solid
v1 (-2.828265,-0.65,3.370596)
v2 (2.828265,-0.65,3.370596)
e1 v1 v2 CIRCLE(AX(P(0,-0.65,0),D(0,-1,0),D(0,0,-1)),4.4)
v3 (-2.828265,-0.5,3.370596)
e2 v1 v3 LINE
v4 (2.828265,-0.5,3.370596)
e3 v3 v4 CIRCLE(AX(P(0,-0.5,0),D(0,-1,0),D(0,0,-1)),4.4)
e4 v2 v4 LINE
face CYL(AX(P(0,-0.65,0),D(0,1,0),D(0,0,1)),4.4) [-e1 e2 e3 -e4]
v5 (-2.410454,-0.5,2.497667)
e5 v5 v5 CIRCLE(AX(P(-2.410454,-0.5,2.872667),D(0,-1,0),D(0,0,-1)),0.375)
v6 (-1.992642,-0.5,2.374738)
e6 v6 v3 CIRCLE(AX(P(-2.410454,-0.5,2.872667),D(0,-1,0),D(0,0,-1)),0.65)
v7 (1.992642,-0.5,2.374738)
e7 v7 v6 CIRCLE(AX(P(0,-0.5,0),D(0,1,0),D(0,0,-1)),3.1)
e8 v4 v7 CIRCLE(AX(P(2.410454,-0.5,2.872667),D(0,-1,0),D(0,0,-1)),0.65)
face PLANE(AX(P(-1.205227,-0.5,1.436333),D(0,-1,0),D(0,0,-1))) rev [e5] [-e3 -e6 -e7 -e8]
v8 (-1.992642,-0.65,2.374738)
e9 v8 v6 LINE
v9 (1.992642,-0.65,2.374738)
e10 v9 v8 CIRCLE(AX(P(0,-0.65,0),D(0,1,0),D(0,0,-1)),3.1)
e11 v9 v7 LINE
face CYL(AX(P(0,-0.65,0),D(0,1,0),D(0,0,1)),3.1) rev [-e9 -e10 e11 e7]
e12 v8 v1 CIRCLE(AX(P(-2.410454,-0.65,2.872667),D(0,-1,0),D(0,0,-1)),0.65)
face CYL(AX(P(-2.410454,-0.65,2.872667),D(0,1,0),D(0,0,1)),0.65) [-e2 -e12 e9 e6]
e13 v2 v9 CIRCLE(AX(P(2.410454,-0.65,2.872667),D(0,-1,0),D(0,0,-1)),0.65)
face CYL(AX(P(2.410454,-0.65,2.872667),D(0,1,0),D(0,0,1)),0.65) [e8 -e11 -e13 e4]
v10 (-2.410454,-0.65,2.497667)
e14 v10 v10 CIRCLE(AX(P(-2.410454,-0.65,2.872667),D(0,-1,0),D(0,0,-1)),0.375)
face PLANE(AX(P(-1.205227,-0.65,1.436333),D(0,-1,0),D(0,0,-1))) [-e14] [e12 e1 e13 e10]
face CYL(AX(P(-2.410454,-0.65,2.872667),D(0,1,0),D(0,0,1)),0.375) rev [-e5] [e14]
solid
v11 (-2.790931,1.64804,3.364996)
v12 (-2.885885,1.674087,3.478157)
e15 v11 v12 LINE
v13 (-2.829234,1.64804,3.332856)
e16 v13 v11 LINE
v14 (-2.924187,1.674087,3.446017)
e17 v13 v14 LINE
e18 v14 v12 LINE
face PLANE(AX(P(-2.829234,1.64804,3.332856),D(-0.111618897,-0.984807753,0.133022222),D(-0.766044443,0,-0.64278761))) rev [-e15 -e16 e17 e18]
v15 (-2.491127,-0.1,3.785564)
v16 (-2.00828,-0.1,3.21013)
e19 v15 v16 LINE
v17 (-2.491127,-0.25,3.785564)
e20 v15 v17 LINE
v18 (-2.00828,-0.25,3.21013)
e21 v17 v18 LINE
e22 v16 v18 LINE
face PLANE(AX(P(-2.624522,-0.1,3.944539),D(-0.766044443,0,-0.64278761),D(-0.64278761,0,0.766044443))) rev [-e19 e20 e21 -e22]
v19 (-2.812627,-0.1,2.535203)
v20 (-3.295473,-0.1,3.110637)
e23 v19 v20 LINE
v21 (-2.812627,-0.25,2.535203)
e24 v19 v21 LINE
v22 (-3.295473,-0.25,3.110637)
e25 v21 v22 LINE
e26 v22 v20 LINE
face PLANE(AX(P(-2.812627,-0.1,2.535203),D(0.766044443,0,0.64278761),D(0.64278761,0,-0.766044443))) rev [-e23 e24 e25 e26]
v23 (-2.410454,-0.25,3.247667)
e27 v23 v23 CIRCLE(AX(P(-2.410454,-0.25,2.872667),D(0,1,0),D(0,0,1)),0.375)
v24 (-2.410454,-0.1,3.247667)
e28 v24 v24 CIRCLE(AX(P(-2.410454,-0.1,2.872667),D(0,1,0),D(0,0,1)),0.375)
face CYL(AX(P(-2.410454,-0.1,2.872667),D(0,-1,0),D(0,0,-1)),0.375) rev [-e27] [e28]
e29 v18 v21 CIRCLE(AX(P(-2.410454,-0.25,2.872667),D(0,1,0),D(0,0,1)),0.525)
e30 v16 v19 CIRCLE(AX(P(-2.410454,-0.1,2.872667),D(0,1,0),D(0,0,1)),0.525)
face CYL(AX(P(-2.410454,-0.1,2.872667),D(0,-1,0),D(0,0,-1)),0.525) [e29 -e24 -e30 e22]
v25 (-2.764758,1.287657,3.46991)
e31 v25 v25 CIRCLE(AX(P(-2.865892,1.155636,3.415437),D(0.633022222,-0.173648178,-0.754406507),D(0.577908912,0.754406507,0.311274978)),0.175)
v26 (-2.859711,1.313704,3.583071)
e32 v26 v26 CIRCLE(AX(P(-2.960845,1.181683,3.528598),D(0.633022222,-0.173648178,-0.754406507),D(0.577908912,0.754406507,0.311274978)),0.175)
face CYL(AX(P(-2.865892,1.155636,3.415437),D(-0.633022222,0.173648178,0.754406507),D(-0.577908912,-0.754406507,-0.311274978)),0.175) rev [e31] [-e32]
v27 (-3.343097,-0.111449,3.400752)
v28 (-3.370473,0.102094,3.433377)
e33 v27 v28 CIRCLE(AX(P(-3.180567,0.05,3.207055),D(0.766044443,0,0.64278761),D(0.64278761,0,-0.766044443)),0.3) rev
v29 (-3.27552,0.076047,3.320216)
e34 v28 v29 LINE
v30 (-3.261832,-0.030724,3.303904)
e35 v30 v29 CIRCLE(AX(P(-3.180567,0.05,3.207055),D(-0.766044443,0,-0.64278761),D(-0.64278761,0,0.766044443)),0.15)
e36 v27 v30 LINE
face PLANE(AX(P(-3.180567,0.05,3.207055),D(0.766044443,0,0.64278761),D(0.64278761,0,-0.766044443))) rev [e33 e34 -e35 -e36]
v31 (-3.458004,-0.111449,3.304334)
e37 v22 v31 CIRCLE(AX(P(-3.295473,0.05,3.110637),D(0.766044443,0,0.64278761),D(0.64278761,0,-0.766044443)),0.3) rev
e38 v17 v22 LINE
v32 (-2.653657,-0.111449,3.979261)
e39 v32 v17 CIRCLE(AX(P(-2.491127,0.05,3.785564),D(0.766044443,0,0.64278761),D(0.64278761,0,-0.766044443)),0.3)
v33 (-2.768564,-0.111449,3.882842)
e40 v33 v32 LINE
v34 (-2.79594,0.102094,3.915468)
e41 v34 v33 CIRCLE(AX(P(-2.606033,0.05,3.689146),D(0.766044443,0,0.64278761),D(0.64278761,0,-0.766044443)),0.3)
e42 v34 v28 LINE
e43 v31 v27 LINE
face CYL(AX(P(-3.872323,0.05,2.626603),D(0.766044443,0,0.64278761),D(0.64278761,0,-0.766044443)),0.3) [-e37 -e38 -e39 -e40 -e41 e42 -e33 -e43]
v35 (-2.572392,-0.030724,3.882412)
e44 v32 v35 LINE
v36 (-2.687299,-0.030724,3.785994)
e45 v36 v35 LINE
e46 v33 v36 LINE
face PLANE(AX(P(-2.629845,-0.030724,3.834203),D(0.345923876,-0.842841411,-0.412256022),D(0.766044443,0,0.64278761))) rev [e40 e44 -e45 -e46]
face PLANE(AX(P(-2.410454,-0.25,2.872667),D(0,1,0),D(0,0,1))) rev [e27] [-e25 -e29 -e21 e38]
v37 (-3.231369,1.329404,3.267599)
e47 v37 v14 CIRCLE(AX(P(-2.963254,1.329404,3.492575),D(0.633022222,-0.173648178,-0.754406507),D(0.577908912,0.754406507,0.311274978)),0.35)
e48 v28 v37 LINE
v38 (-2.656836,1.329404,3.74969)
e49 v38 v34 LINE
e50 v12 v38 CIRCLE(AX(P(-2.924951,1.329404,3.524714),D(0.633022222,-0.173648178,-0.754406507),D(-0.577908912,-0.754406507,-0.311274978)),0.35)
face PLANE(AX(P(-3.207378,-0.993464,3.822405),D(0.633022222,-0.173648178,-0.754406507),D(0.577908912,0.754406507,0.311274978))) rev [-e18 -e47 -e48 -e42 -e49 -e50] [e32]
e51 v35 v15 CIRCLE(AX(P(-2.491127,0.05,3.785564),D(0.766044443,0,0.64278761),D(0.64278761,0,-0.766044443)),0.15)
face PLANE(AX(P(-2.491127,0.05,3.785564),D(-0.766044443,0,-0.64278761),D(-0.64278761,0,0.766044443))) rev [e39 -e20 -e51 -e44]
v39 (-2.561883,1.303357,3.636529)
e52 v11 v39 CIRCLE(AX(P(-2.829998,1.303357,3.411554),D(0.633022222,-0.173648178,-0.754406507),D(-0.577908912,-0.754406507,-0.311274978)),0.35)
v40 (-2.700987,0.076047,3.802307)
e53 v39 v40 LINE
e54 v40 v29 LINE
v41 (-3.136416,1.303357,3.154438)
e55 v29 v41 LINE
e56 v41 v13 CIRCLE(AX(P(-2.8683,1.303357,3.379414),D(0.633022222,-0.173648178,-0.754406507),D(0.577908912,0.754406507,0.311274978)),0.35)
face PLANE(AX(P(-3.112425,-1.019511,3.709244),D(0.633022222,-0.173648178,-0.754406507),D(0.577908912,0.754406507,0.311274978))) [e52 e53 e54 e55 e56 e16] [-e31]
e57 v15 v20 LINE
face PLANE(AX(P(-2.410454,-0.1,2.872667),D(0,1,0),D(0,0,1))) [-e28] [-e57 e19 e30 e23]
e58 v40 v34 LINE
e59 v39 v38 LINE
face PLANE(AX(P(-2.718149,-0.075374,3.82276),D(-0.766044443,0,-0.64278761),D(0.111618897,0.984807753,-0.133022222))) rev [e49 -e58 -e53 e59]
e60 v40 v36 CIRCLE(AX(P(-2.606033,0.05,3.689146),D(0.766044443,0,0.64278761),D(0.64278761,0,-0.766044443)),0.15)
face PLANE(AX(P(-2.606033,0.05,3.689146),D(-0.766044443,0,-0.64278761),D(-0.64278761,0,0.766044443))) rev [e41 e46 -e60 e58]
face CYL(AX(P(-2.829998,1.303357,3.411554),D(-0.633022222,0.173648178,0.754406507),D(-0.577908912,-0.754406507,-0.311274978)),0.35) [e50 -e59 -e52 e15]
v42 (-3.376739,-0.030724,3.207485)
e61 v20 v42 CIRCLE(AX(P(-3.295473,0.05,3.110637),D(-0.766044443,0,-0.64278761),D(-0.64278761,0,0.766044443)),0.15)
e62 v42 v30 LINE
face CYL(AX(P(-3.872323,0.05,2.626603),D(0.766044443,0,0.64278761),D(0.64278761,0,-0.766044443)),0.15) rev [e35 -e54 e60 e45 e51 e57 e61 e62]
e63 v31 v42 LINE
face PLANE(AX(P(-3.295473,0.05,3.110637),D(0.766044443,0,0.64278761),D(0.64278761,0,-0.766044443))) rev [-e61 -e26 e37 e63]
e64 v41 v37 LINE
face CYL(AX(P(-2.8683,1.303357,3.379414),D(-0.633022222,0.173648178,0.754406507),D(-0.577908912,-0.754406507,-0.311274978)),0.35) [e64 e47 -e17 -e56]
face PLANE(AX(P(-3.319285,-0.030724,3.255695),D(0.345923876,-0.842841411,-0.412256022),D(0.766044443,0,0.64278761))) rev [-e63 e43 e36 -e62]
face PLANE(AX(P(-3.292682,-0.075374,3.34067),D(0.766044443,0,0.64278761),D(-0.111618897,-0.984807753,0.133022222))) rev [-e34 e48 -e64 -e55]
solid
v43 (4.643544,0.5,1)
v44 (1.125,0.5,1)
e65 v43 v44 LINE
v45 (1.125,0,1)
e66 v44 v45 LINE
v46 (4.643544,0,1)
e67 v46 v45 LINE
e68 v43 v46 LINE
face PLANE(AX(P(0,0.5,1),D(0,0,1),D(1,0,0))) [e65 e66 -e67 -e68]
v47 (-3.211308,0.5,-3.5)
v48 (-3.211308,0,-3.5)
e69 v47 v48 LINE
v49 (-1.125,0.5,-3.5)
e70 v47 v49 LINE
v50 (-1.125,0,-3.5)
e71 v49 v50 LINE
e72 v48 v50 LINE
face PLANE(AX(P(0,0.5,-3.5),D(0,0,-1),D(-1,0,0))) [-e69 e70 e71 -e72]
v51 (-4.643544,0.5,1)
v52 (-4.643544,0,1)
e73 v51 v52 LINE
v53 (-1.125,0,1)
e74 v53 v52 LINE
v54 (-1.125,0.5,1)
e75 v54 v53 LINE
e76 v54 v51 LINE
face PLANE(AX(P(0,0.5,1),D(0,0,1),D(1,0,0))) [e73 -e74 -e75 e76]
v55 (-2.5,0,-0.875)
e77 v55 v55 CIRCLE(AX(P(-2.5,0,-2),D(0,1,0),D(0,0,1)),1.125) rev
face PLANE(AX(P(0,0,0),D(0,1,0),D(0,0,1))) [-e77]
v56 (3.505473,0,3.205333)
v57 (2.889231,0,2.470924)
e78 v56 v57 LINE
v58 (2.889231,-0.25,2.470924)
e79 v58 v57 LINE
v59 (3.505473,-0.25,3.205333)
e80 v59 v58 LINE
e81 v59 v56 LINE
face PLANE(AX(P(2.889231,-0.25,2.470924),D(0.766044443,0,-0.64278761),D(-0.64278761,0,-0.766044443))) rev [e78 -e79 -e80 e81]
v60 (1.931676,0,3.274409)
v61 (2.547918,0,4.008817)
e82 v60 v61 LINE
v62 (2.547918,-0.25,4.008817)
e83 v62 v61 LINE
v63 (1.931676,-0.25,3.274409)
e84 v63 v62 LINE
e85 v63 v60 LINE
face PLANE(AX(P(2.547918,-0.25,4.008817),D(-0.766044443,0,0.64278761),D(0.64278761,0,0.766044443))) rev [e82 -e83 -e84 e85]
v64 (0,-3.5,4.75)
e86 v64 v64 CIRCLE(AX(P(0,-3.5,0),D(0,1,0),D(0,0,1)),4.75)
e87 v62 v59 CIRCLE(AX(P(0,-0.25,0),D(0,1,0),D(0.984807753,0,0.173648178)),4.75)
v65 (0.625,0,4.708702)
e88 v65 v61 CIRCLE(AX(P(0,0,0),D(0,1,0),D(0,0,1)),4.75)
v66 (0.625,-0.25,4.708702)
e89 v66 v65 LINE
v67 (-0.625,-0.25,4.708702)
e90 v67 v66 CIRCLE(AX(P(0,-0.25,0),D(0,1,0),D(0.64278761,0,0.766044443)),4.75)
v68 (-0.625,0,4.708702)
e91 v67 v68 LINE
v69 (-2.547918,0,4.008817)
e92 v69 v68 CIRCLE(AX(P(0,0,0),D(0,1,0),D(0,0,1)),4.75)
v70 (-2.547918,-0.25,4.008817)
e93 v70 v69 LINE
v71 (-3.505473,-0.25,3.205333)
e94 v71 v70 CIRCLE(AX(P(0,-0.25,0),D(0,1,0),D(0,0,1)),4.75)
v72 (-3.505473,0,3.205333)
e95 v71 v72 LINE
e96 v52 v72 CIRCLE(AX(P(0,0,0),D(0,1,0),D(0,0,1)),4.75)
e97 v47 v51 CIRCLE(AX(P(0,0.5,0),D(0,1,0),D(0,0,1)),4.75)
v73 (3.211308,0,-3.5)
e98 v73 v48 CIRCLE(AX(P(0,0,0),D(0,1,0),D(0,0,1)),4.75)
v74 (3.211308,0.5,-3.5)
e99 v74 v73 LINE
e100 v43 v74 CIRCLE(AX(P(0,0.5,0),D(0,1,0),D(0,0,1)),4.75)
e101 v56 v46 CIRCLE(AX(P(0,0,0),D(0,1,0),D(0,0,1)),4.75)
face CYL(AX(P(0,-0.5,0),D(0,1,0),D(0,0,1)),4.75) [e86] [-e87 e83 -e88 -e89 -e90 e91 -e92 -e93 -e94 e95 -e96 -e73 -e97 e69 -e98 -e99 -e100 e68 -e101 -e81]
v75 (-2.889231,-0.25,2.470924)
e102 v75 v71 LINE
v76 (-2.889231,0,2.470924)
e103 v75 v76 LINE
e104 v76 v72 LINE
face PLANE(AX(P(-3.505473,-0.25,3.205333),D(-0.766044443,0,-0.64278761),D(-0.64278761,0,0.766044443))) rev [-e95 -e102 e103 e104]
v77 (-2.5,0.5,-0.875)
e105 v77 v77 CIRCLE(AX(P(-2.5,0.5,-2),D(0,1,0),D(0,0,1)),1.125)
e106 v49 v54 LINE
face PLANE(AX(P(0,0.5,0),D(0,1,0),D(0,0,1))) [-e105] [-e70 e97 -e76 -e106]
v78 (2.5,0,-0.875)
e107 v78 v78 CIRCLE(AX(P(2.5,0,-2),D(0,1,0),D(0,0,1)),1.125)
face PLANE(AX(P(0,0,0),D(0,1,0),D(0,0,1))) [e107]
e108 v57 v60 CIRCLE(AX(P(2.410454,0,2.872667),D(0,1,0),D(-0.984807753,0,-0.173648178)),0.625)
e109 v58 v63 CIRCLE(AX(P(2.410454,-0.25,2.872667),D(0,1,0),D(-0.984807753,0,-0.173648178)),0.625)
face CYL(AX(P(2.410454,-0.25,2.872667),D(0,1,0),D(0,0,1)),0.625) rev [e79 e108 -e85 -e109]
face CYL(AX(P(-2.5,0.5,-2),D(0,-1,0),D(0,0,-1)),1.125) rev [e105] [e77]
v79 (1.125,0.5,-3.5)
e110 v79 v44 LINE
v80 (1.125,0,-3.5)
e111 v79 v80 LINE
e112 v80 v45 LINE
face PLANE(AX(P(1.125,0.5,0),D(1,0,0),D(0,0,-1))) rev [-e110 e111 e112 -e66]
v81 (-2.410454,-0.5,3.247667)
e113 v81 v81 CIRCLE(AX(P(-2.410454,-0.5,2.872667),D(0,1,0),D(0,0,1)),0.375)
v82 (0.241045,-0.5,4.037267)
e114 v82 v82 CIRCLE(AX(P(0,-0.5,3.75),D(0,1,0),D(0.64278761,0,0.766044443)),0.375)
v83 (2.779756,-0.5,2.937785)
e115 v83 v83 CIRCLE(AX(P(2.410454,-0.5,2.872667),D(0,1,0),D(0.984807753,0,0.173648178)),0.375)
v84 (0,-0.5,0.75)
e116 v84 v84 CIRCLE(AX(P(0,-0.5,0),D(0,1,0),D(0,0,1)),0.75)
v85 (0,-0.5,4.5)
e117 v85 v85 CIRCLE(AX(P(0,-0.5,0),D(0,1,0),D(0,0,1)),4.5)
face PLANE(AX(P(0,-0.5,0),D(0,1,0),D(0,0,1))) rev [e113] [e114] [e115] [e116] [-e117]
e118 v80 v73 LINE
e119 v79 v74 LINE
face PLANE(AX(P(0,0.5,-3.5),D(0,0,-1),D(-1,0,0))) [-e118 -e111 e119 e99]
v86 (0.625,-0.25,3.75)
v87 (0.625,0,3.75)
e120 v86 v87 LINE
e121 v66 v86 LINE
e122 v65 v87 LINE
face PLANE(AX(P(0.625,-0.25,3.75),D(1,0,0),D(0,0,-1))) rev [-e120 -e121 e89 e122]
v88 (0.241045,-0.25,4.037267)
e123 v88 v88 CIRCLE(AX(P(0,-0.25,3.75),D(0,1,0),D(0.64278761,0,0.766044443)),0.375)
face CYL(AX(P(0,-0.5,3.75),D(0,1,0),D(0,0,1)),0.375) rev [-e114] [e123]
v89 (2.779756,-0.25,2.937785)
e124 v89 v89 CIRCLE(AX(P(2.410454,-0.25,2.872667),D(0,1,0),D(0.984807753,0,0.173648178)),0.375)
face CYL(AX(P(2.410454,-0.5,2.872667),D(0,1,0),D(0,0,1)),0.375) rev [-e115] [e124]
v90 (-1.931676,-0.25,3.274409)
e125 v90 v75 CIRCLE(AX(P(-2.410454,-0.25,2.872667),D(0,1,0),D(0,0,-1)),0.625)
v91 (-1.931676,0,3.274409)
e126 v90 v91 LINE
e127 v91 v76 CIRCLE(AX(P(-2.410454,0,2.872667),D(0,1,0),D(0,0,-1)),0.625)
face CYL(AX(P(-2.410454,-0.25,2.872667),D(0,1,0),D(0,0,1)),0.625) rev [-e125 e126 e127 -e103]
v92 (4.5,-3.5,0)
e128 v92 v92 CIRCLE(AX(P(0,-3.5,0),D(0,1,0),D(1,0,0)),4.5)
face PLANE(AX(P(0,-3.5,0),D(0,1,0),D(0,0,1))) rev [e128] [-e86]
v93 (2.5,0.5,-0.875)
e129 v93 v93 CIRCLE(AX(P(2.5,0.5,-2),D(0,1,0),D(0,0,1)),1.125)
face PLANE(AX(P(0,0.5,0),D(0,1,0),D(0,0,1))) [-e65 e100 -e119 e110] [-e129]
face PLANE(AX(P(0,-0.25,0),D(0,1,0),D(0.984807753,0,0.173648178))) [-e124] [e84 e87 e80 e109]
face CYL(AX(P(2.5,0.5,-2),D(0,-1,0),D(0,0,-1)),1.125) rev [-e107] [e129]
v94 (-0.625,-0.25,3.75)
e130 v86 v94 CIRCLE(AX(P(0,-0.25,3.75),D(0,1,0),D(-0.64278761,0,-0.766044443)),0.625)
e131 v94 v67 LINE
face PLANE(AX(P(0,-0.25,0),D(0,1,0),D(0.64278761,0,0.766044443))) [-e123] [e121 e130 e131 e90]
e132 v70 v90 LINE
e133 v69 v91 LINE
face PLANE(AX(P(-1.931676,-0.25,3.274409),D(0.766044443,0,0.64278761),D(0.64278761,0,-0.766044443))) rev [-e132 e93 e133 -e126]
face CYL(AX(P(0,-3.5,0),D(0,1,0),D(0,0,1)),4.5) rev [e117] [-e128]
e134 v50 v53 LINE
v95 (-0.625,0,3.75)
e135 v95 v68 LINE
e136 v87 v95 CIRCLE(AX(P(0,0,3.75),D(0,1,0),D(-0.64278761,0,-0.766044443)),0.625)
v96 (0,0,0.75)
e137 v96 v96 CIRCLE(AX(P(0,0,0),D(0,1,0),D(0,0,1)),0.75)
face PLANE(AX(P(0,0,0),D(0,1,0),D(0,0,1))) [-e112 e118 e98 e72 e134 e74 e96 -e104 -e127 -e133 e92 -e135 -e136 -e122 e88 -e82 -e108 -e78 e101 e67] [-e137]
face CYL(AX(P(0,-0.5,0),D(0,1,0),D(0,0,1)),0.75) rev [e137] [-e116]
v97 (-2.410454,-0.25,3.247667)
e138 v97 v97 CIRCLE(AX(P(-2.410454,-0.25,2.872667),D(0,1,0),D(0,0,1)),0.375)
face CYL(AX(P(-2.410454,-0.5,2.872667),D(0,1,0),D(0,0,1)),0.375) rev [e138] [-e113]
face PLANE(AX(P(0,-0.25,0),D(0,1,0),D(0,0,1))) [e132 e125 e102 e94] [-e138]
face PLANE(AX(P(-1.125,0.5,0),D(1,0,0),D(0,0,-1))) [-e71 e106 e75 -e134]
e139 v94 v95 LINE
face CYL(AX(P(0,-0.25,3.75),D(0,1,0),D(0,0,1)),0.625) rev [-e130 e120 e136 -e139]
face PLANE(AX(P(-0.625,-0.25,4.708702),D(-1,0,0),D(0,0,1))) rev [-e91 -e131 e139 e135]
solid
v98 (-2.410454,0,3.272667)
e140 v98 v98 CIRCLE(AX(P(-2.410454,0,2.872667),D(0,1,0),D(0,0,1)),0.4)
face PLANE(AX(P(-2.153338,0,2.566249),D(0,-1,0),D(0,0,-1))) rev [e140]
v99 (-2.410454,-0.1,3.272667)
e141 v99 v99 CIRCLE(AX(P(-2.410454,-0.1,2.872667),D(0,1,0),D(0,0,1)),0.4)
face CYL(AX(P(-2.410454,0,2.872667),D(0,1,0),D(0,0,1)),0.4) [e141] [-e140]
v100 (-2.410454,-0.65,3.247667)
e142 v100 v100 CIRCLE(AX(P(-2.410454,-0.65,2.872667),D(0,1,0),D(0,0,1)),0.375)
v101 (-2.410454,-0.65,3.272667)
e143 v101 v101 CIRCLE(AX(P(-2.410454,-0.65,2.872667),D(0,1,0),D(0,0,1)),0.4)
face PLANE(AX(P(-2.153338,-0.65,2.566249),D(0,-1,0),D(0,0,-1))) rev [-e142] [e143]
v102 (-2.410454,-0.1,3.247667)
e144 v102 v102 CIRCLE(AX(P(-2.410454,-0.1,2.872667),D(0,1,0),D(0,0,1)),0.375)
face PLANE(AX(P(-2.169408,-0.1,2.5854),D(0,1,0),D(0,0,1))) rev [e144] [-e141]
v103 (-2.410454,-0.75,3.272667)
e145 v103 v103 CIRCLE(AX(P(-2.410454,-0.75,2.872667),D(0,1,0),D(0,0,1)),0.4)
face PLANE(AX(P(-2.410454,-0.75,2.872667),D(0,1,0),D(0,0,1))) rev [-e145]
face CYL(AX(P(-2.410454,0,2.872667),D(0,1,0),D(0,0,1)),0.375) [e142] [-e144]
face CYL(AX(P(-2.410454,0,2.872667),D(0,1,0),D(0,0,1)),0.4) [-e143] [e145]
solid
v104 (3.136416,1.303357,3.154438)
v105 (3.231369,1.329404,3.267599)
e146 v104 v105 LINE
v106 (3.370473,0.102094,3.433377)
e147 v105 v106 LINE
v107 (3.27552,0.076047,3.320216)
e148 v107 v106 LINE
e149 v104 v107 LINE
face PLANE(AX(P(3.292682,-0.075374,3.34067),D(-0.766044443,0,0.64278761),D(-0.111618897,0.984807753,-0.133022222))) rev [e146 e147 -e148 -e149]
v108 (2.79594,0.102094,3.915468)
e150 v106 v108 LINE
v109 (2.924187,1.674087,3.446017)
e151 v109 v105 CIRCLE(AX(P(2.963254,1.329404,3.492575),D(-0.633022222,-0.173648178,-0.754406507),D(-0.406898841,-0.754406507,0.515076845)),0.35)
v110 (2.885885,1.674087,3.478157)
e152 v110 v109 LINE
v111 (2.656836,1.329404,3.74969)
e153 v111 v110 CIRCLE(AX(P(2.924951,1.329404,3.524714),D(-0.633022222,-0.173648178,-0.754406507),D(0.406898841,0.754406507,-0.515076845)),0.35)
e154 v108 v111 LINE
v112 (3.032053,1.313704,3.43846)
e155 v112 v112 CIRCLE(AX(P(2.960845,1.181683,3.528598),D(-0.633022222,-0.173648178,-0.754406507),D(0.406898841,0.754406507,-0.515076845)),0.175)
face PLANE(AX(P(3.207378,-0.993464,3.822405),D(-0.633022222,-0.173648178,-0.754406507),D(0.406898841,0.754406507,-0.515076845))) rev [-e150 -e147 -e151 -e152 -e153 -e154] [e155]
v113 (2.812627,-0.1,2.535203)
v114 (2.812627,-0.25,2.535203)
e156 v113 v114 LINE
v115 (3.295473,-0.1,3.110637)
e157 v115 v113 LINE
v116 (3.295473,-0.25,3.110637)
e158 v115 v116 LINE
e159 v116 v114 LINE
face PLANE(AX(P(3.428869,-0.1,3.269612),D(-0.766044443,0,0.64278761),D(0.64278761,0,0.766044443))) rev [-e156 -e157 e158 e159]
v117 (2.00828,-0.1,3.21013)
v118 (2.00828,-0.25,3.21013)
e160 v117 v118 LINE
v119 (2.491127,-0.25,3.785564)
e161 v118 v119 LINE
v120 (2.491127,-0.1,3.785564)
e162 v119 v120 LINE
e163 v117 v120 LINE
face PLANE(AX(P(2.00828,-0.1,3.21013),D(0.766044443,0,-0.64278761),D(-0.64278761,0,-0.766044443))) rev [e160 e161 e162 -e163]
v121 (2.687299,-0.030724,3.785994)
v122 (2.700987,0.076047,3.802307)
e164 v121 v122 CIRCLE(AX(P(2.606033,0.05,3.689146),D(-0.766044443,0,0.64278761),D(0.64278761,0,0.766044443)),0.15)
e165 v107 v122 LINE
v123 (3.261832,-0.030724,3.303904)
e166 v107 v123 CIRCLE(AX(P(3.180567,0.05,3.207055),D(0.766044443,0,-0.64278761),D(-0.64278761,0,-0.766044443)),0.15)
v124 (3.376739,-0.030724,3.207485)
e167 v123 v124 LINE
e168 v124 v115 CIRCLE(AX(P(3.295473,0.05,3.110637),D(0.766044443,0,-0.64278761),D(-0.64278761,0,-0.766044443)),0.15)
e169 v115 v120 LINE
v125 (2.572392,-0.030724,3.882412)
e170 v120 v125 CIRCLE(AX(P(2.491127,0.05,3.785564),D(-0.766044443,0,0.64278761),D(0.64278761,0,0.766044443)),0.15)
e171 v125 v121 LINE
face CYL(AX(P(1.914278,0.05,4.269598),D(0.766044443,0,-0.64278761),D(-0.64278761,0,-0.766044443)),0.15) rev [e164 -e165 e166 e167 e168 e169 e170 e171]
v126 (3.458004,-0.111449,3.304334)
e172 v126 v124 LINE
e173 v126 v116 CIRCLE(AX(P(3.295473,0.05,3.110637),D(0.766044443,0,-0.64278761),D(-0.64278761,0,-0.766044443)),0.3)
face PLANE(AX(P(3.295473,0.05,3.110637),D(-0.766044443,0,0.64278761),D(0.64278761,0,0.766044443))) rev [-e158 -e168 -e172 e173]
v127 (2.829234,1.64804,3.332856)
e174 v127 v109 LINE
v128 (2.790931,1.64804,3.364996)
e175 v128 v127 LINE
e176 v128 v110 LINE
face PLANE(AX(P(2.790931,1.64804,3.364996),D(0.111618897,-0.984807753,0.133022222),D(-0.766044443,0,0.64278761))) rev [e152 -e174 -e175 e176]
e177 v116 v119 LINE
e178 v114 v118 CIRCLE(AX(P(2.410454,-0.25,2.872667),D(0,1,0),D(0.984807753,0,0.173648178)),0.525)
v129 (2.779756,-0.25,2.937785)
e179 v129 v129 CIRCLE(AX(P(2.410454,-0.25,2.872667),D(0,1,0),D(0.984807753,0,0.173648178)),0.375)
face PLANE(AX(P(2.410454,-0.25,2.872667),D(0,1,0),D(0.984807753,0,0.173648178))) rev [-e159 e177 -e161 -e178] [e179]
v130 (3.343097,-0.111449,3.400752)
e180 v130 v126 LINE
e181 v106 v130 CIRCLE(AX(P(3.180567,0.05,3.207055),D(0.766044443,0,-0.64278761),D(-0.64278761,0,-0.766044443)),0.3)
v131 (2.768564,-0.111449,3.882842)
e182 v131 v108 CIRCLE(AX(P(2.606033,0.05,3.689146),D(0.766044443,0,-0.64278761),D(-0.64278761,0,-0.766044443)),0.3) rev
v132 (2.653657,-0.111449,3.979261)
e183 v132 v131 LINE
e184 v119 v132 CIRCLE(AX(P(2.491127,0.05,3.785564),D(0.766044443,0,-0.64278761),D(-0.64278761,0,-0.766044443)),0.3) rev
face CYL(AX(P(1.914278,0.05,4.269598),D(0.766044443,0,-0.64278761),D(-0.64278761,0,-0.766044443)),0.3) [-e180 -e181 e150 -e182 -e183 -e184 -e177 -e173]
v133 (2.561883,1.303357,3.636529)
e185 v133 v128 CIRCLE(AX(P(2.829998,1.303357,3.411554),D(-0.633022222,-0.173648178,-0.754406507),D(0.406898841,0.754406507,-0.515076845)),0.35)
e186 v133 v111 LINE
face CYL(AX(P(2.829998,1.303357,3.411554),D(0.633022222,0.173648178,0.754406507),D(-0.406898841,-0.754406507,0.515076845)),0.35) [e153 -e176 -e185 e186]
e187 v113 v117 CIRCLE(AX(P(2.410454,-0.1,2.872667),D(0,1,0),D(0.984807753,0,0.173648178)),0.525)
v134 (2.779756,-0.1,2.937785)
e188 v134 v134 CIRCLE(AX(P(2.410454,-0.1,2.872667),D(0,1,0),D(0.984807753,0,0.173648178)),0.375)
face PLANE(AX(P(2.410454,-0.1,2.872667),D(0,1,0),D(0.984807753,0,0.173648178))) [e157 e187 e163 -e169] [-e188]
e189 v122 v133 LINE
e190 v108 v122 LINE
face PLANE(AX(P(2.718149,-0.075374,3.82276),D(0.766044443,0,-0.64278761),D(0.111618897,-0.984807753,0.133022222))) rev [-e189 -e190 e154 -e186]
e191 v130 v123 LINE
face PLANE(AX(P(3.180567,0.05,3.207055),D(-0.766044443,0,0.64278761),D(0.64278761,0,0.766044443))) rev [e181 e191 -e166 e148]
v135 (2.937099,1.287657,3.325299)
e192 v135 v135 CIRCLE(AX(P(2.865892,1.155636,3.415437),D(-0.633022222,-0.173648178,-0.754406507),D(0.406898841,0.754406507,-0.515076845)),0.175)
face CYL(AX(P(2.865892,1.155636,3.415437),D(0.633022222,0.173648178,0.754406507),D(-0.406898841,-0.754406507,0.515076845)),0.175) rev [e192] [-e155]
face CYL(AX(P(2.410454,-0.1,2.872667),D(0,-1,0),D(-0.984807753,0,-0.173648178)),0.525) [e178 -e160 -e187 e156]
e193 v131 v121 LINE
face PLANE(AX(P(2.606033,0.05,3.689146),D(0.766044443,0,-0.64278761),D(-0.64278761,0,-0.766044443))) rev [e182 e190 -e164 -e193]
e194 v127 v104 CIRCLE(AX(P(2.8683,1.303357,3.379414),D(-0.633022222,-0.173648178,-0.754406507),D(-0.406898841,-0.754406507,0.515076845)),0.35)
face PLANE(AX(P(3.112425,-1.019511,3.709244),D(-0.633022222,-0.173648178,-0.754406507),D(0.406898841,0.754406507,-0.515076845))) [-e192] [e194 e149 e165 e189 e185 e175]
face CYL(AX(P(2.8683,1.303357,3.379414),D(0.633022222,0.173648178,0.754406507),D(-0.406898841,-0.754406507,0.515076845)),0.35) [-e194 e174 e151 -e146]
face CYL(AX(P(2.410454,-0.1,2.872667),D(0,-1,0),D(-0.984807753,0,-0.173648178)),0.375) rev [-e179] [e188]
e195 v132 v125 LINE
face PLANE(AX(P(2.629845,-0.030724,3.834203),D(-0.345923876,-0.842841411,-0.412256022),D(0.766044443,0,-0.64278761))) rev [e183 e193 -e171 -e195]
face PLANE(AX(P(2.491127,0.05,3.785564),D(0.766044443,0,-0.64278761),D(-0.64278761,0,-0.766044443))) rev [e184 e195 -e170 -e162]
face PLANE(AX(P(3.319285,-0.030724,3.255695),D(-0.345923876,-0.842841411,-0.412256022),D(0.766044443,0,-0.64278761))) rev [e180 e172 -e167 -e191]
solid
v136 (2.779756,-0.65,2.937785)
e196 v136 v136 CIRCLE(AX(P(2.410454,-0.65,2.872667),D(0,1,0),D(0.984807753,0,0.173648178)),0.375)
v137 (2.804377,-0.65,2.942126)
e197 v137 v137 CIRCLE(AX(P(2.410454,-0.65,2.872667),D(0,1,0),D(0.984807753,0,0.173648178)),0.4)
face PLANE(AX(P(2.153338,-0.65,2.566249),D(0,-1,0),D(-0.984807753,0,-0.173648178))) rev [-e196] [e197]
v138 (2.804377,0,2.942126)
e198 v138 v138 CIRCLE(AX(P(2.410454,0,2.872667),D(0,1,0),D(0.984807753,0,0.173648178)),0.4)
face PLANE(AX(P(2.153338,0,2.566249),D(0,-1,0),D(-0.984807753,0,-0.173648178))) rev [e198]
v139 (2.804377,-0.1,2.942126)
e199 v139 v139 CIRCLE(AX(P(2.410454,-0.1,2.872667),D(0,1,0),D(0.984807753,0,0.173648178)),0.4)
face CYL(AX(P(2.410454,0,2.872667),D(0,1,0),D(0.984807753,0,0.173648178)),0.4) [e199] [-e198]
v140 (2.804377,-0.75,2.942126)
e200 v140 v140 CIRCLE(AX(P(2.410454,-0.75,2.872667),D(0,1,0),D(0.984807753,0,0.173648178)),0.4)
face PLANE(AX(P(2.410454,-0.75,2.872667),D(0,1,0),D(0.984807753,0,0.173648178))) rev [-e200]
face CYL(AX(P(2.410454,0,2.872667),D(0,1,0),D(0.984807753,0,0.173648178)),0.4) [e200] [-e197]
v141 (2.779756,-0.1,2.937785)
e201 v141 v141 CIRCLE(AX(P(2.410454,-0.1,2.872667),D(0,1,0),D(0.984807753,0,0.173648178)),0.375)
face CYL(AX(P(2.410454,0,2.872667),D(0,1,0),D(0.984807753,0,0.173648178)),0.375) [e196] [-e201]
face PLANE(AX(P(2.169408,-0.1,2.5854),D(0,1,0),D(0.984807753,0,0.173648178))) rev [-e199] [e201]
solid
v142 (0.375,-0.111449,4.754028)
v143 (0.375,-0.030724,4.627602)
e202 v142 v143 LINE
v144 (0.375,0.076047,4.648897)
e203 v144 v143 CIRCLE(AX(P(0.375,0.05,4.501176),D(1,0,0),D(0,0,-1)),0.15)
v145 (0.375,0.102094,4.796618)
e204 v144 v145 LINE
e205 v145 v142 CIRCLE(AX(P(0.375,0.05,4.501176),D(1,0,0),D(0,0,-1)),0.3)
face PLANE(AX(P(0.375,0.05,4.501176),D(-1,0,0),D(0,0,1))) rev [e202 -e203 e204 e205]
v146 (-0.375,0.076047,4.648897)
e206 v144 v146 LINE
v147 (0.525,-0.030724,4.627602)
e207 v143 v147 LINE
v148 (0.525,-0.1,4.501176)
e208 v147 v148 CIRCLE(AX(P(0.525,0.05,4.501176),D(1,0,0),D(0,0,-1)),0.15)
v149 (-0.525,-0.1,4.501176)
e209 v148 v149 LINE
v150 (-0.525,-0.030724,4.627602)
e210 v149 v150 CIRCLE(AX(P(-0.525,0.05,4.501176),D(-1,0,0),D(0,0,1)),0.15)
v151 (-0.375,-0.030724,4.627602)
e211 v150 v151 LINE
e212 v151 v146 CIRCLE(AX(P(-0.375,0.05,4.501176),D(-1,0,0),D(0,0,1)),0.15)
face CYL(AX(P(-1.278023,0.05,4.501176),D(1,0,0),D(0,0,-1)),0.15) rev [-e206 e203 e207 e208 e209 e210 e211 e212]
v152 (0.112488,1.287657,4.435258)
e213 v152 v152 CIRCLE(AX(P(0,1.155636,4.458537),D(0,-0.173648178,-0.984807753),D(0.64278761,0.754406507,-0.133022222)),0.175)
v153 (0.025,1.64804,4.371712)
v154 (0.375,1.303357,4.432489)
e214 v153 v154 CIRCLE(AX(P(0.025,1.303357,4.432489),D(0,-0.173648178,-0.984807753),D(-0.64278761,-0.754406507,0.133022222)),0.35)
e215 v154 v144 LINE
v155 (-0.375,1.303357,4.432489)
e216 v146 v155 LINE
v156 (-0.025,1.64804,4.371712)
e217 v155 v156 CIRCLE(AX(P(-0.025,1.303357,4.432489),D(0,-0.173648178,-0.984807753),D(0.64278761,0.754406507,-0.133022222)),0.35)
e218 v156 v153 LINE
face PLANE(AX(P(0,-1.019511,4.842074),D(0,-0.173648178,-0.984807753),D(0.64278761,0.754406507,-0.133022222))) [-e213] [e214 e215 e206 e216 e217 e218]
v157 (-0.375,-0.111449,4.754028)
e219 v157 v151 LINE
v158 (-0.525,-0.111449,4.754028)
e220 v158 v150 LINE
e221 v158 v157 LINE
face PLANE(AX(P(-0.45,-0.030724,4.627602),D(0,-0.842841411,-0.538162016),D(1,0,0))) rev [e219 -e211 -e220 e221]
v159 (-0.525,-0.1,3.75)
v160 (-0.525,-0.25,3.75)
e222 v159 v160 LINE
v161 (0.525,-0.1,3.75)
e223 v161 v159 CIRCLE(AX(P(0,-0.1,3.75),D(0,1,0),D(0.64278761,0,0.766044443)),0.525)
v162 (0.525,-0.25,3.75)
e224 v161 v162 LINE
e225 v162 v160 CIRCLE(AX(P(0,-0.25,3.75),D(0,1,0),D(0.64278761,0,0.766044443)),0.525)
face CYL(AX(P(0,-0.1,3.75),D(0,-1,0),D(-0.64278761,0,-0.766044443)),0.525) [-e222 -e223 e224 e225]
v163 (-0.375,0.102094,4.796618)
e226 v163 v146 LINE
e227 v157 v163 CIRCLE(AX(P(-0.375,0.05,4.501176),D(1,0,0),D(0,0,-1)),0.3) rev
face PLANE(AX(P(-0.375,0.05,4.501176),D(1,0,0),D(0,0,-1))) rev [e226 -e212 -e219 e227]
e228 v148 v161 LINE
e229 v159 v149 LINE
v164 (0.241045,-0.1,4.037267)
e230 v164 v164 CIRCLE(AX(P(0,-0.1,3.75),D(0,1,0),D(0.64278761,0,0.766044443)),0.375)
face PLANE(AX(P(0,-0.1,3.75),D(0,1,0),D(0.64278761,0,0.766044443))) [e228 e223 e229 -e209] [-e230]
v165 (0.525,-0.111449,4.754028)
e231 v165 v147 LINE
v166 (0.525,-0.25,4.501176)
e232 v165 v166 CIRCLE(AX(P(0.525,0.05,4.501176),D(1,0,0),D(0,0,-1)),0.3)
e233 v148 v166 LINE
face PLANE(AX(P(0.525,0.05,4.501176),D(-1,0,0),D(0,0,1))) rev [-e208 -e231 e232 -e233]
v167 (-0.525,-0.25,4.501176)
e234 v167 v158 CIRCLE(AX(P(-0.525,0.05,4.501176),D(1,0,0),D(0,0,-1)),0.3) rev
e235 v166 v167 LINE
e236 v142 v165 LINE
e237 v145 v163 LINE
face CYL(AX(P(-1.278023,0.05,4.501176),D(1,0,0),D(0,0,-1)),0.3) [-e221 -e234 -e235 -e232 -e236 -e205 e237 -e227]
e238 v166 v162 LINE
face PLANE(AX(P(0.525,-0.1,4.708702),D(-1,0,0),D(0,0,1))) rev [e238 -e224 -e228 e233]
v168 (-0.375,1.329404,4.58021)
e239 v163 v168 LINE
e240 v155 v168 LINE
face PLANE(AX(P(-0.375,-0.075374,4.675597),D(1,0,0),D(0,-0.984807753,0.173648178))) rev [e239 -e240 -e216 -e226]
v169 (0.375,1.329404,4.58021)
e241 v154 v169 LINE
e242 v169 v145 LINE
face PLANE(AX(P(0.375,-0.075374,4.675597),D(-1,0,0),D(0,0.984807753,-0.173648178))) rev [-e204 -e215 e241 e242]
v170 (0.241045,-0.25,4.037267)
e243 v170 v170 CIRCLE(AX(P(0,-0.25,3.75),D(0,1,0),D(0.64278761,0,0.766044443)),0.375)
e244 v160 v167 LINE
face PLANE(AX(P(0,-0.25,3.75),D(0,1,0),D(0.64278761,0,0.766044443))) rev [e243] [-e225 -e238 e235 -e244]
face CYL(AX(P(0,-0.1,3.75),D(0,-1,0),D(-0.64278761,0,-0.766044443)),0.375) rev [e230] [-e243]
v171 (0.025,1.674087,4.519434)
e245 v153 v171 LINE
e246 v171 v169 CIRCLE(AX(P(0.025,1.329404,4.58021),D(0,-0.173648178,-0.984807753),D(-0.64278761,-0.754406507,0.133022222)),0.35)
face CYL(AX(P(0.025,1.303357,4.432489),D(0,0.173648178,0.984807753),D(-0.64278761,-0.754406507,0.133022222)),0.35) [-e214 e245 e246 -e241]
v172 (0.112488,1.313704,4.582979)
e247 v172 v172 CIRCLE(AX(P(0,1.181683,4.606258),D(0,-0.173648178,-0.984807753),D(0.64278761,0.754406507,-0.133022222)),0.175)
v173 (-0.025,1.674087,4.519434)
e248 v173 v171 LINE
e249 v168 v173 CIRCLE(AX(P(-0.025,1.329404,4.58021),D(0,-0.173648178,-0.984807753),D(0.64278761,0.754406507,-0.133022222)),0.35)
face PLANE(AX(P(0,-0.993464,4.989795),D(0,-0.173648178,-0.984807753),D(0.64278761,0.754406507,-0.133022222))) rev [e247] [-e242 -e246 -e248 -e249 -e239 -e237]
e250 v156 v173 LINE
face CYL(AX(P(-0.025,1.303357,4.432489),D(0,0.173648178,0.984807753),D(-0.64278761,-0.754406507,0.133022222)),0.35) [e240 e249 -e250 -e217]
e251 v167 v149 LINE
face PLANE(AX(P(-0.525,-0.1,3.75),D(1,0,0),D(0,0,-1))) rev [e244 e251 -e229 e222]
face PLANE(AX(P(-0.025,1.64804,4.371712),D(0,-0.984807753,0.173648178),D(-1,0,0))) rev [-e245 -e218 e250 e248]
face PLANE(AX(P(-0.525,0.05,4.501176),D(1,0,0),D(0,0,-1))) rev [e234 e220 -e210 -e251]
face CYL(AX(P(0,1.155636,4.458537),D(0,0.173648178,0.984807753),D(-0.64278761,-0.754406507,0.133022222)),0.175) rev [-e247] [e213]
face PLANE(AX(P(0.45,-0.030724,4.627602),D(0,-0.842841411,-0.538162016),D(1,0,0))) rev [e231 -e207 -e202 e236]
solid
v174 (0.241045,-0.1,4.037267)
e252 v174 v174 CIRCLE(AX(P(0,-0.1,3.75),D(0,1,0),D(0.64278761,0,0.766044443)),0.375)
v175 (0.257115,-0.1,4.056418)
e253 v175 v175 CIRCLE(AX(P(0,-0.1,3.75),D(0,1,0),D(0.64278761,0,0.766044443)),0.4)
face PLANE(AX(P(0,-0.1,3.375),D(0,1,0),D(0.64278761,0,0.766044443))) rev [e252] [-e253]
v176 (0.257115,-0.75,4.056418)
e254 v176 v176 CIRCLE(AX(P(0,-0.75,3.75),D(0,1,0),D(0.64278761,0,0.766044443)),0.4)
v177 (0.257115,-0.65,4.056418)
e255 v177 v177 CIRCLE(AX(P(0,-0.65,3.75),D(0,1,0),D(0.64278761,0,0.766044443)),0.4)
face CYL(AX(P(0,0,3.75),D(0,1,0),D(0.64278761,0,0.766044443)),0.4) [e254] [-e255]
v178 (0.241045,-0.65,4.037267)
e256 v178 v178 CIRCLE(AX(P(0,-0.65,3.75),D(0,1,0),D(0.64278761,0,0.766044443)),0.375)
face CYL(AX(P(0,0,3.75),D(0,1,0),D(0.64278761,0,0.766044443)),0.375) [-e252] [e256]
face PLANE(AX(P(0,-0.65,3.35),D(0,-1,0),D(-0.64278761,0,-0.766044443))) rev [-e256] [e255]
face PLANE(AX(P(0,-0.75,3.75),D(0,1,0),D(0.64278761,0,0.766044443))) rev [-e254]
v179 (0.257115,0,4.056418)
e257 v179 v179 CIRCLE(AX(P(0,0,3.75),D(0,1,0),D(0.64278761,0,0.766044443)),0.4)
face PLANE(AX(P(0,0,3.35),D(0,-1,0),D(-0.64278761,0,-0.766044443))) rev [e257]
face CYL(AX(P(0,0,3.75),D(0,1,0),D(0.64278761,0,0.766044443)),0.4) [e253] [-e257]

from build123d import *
from build123d.topology import SkipClean

# Parameters (mm, degrees)
SKETCH_1_R               = 4.75
SKETCH_1_R_2             = 0.75
EXTRUDE_1_DEPTH          = 0.5
EXTRUDE_START            = 0.5
SKETCH_1_3_R             = 1.125
EXTRUDE_2_DEPTH          = 0.5
SKETCH_3_R               = 0.375
CUT_EXTRUDE_1_DEPTH      = 7.736096793
SKETCH_3_3_R             = 0.375
CUT_EXTRUDE_2_DEPTH      = 0.25
PATTERN_CIRCULAR_1_COUNT = 3
PATTERN_CIRCULAR_1_ANGLE = 80
EXTRUDE_START_2          = -0.5
SKETCH_1_4_R             = 4.75
SKETCH_1_4_R_2           = 4.5
EXTRUDE_1_2_DEPTH        = 3
SM_START                 = 0.15
SKETCH_13_R              = 0.175
SKETCH_13_R_2            = 0.375
SM_BASE_FLANGE_1_DEPTH   = 0.15
OTHER_START              = -0.525
OTHER_1_DEPTH            = 1.05
OTHER_1_2_DEPTH          = 1.05
OTHER_START_2            = -0.375
OTHER_1_3_DEPTH          = 0.75
OTHER_START_3            = -4.741475404
OTHER_1_4_OUTLINE_R      = 0.175
OTHER_1_4_DEPTH          = 0.149999999
SKETCH_20_R              = 0.375
SM_BASE_FLANGE_2_DEPTH   = 0.15
PATTERN_CIRCULAR_2_COUNT = 3
PATTERN_CIRCULAR_2_ANGLE = 80


with BuildPart() as part:
    # Sketch 1 → Extrude 1 (new body)
    with BuildSketch(Plane(origin=(0, 0, 0), x_dir=(1, 0, 0), z_dir=(0, 1, 0))):
        with Locations(Location((0, 0, 0), (0, 0, 270))):
            Circle(SKETCH_1_R)
        with Locations(Location((0, 0, 0), (0, 0, 270))):
            Circle(SKETCH_1_R_2, mode=Mode.SUBTRACT)
    extrude(amount=-EXTRUDE_1_DEPTH)

    # 草图1<3> → 凸台-拉伸2 (add)
    # profile 1 of 2: a face of its own
    with BuildSketch(Plane(origin=(0, 0, 0), x_dir=(1, 0, 0), z_dir=(0, 1, 0)).offset(EXTRUDE_START)):
        with BuildLine():
            Line((1.125, -1), (4.643543905, -1))
            ThreePointArc((4.643543905, -1), (4.723310997, -0.502825243), (4.75, 0))
            ThreePointArc((4.75, 0), (4.348345299, 1.911646713), (3.211308145, 3.5))
            Line((3.211308145, 3.5), (1.125, 3.5))
            Line((1.125, 3.5), (1.125, -1))
        make_face()
        with Locations(Location((2.5, 2, 0), (0, 0, 270))):
            Circle(SKETCH_1_3_R, mode=Mode.SUBTRACT)
    # profile 2 of 2: a face of its own
    with BuildSketch(Plane(origin=(0, 0, 0), x_dir=(1, 0, 0), z_dir=(0, 1, 0)).offset(EXTRUDE_START)):
        with BuildLine():
            ThreePointArc((-3.211308145, 3.5), (-4.526276083, 1.440598771), (-4.643543905, -1))
            Line((-4.643543905, -1), (-1.125, -1))
            Line((-1.125, -1), (-1.125, 3.5))
            Line((-1.125, 3.5), (-3.211308145, 3.5))
        make_face()
        with Locations(Location((-2.5, 2, 0), (0, 0, 270))):
            Circle(SKETCH_1_3_R, mode=Mode.SUBTRACT)
    extrude(amount=-EXTRUDE_2_DEPTH)

    # 草图3 → 切除-拉伸1 (cut, through all)
    with BuildSketch(Plane(origin=(0, 0, 0), x_dir=(1, 0, 0), z_dir=(0, 1, 0))):
        with Locations(Location((-2.410453536, -2.872666662, 0), (0, 0, 270))):
            Circle(SKETCH_3_R)
    cut_extrude_1 = extrude(amount=-CUT_EXTRUDE_1_DEPTH, mode=Mode.SUBTRACT)

    # 草图3<3> → 切除-拉伸2 (cut)
    with BuildSketch(Plane(origin=(0, 0, 0), x_dir=(1, 0, 0), z_dir=(0, 1, 0))):
        with BuildLine():
            Line((-3.505473113, -3.205332784), (-2.889231313, -2.470924406))
            ThreePointArc((-2.889231313, -2.470924406), (-2.00871128, -2.393888885), (-1.931675759, -3.274408918))
            Line((-1.931675759, -3.274408918), (-2.547917559, -4.008817296))
            ThreePointArc((-2.547917559, -4.008817296), (-3.053241146, -3.638711105), (-3.505473113, -3.205332784))
        make_face()
        with Locations(Location((-2.410453536, -2.872666662, 0), (0, 0, 270))):
            Circle(SKETCH_3_3_R, mode=Mode.SUBTRACT)
    cut_extrude_2 = extrude(amount=-CUT_EXTRUDE_2_DEPTH, mode=Mode.SUBTRACT)

    # 阵列(圆周)1: 切除-拉伸1, 切除-拉伸2 ×3 about axis
    pattern_circular_1_axis = Axis((0, 0, 0), (0, 1, 0))
    add([cut_extrude_1.rotate(pattern_circular_1_axis, i * PATTERN_CIRCULAR_1_ANGLE / (PATTERN_CIRCULAR_1_COUNT - 1)) for i in range(1, PATTERN_CIRCULAR_1_COUNT)], mode=Mode.SUBTRACT)
    add([cut_extrude_2.rotate(pattern_circular_1_axis, i * PATTERN_CIRCULAR_1_ANGLE / (PATTERN_CIRCULAR_1_COUNT - 1)) for i in range(1, PATTERN_CIRCULAR_1_COUNT)], mode=Mode.SUBTRACT)

    # 草图1<4> → Extrude 1 2 (add)
    with BuildSketch(Plane(origin=(0, 0, 0), x_dir=(1, 0, 0), z_dir=(0, 1, 0)).offset(EXTRUDE_START_2)):
        Circle(SKETCH_1_4_R)
        Circle(SKETCH_1_4_R_2, mode=Mode.SUBTRACT)
    extrude(amount=-EXTRUDE_1_2_DEPTH)


with BuildPart() as body_2:
    # 基体-法兰1: sheet metal written as solids
    # 草图13 → 基体-法兰1 (new body)
    with BuildSketch(Plane(origin=(0, -0.25, 0), x_dir=(1, 0, 0), z_dir=(0, 1, 0)).offset(SM_START)):
        with BuildLine():
            Line((-3.313962002, -3.366029686), (-4.213864655, -4.438491907))
            ThreePointArc((-4.213864655, -4.438491907), (-4.294417245, -4.69397208), (-4.170724764, -4.931583125))
            Line((-4.170724764, -4.931583125), (-4.132422542, -4.963722506))
            ThreePointArc((-4.132422542, -4.963722506), (-3.876942368, -5.044275095), (-3.639331323, -4.920582614))
            Line((-3.639331323, -4.920582614), (-2.73942867, -3.848120394))
            Line((-2.73942867, -3.848120394), (-2.624522003, -3.944538535))
            Line((-2.624522003, -3.944538535), (-2.008280204, -3.210130157))
            ThreePointArc((-2.008280204, -3.210130157), (-2.072990041, -2.470493329), (-2.812626869, -2.535203167))
            Line((-2.812626869, -2.535203167), (-3.428868668, -3.269611545))
            Line((-3.428868668, -3.269611545), (-3.313962002, -3.366029686))
        make_face()
        with Locations(Location((-3.830179848, -4.564630594, 0), (0, 0, 270))):
            Circle(SKETCH_13_R, mode=Mode.SUBTRACT)
        with Locations(Location((-2.410453536, -2.872666662, 0), (0, 0, 270))):
            Circle(SKETCH_13_R_2, mode=Mode.SUBTRACT)
    extrude(amount=-SM_BASE_FLANGE_1_DEPTH)

    # Other 1: read off the stored shape, not the designer's step
    # Other 1 outline → Other 1 (cut)
    with BuildSketch(Plane(origin=(0, 0, 0), x_dir=(0.6427876096865404, 0, -0.7660444431189772), z_dir=(0.7660444431189772, 0, 0.6427876096865403)).offset(OTHER_START)):
        with BuildLine():
            Line((-4.760983594, -0.1), (-6.45870205, -0.1))
            Line((-6.45870205, -0.1), (-6.45870205, -0.25))
            Line((-6.45870205, -0.25), (-4.501175973, -0.25))
            ThreePointArc((-4.501175973, -0.25), (-4.651175973, -0.209807621), (-4.760983594, -0.1))
        make_face()
    extrude(amount=OTHER_1_DEPTH, mode=Mode.SUBTRACT)

    # Other 1 2 outline → Other 1 2 (add)
    with SkipClean():  # the faces are left unmerged after this step: merging them gives an invalid solid
        with BuildSketch(Plane(origin=(0, 0, 0), x_dir=(0.6427876096865404, 0, -0.7660444431189772), z_dir=(0.7660444431189772, 0, 0.6427876096865403)).offset(OTHER_START)):
            with BuildLine():
                ThreePointArc((-4.501175973, -0.1), (-4.57325702, -0.081545895), (-4.627602184, -0.030724302))
                Line((-4.627602184, -0.030724302), (-4.754028396, -0.111448605))
                ThreePointArc((-4.754028396, -0.111448605), (-4.73301345, -0.140397963), (-4.70870205, -0.166640087))
                Line((-4.70870205, -0.166640087), (-4.70870205, -0.1))
                Line((-4.70870205, -0.1), (-4.501175973, -0.1))
            make_face()
        extrude(amount=OTHER_1_2_DEPTH)

    # Other 1 3 outline → Other 1 3 (add)
    with SkipClean():  # the faces are left unmerged after this step: merging them gives an invalid solid
        with BuildSketch(Plane(origin=(0, 0, 0), x_dir=(0.6427876096865404, 0, -0.7660444431189772), z_dir=(0.7660444431189772, 0, 0.6427876096865403)).offset(OTHER_START_2)):
            with BuildLine():
                ThreePointArc((-4.627602184, -0.030724302), (-4.648278779, 0.020661214), (-4.648897136, 0.076047227))
                Line((-4.648897136, 0.076047227), (-4.371712461, 1.648039633))
                Line((-4.371712461, 1.648039633), (-4.519433624, 1.674086859))
                Line((-4.519433624, 1.674086859), (-4.796618299, 0.102094453))
                ThreePointArc((-4.796618299, 0.102094453), (-4.796618299, -0.002094454), (-4.760983594, -0.1))
                Line((-4.760983594, -0.1), (-4.736098185, -0.1))
                Line((-4.736098185, -0.1), (-4.627602184, -0.030724302))
            make_face()
        extrude(amount=OTHER_1_3_DEPTH)

    # Other 1 4 outline → Other 1 4 (cut)
    with SkipClean():  # the faces are left unmerged after this step: merging them gives an invalid solid
        with BuildSketch(Plane(origin=(0, 0, 0), x_dir=(0.7741336234862095, 0.14199506630580766, 0.6168910228986324), z_dir=(0.6330222215594896, -0.1736481776669339, -0.7544065067354877)).offset(OTHER_START_3)):
            with BuildLine():
                Line((-0.246525022, -0.908905109), (0.099817711, -0.858440159))
                ThreePointArc((0.099817711, -0.858440159), (-0.159864425, -0.792682829), (-0.296989971, -0.562562375))
                Line((-0.296989971, -0.562562375), (-0.246525022, -0.908905109))
            make_face()
            with BuildLine():
                ThreePointArc((0.445173029, -0.454423198), (0.379415699, -0.714105335), (0.149295245, -0.851230881))
                Line((0.149295245, -0.851230881), (0.495637978, -0.800765932))
                Line((0.495637978, -0.800765932), (0.445173029, -0.454423198))
            make_face()
            with Locations((0.052463694, -0.360060187)):
                Circle(OTHER_1_4_OUTLINE_R)
        extrude(amount=OTHER_1_4_DEPTH, mode=Mode.SUBTRACT)


with BuildPart() as body_3:
    # 基体-法兰2: sheet metal written as solids
    # 草图20 → 基体-法兰2 (new body)
    with BuildSketch(Plane.XZ.offset(0.5)):
        with BuildLine():
            ThreePointArc((-2.828265483, 3.37059555), (0, -4.4), (2.828265483, 3.37059555))
            ThreePointArc((2.828265483, 3.37059555), (1.912524648, 3.290478608), (1.99264159, 2.374737774))
            ThreePointArc((1.99264159, 2.374737774), (0, -3.1), (-1.99264159, 2.374737774))
            ThreePointArc((-1.99264159, 2.374737774), (-1.912524648, 3.290478608), (-2.828265483, 3.37059555))
        make_face()
        with Locations(Location((-2.410453536, 2.872666662, 0), (0, 0, 270))):
            Circle(SKETCH_20_R, mode=Mode.SUBTRACT)
    extrude(amount=SM_BASE_FLANGE_2_DEPTH)


with BuildPart() as body_4:
    # 草图23 → 旋转1 (revolve)
    with BuildSketch(Plane(origin=(0, 0, 0), x_dir=(0.6427876096865349, 0, -0.7660444431189818), z_dir=(0.7660444431189817, 0, 0.6427876096865348)), mode=Mode.PRIVATE) as revolve_1_sk:
        Polygon((-3.375, -0.1), (-3.35, -0.1), (-3.35, 0), (-3.75, 0), (-3.75, -0.650298416), (-3.75, -0.75), (-3.35, -0.75), (-3.35, -0.65), (-3.375, -0.65), align=None)
    revolve(revolve_1_sk.sketch.rotate(Axis((-2.410453536, 0, 2.872666662), (0, -1, 0)), 140), axis=Axis((-2.410453536, 0, 2.872666662), (0, -1, 0)))


with BuildPart() as pattern_circular_2_1:
    # 阵列(圆周)2: pattern copy
    add(body_2.part.rotate(Axis((0, 0, 0), (0, 1, 0)), 1 * PATTERN_CIRCULAR_2_ANGLE / (PATTERN_CIRCULAR_2_COUNT - 1)))


with BuildPart() as pattern_circular_2_2:
    # 阵列(圆周)2: pattern copy
    add(body_2.part.rotate(Axis((0, 0, 0), (0, 1, 0)), 2 * PATTERN_CIRCULAR_2_ANGLE / (PATTERN_CIRCULAR_2_COUNT - 1)))


with BuildPart() as pattern_circular_2_3:
    # 阵列(圆周)2: pattern copy
    add(body_4.part.rotate(Axis((0, 0, 0), (0, 1, 0)), 1 * PATTERN_CIRCULAR_2_ANGLE / (PATTERN_CIRCULAR_2_COUNT - 1)))


with BuildPart() as pattern_circular_2_4:
    # 阵列(圆周)2: pattern copy
    add(body_4.part.rotate(Axis((0, 0, 0), (0, 1, 0)), 2 * PATTERN_CIRCULAR_2_ANGLE / (PATTERN_CIRCULAR_2_COUNT - 1)))


solid = Compound([part.part, body_2.part, body_3.part, body_4.part, pattern_circular_2_1.part, pattern_circular_2_2.part, pattern_circular_2_3.part, pattern_circular_2_4.part])
